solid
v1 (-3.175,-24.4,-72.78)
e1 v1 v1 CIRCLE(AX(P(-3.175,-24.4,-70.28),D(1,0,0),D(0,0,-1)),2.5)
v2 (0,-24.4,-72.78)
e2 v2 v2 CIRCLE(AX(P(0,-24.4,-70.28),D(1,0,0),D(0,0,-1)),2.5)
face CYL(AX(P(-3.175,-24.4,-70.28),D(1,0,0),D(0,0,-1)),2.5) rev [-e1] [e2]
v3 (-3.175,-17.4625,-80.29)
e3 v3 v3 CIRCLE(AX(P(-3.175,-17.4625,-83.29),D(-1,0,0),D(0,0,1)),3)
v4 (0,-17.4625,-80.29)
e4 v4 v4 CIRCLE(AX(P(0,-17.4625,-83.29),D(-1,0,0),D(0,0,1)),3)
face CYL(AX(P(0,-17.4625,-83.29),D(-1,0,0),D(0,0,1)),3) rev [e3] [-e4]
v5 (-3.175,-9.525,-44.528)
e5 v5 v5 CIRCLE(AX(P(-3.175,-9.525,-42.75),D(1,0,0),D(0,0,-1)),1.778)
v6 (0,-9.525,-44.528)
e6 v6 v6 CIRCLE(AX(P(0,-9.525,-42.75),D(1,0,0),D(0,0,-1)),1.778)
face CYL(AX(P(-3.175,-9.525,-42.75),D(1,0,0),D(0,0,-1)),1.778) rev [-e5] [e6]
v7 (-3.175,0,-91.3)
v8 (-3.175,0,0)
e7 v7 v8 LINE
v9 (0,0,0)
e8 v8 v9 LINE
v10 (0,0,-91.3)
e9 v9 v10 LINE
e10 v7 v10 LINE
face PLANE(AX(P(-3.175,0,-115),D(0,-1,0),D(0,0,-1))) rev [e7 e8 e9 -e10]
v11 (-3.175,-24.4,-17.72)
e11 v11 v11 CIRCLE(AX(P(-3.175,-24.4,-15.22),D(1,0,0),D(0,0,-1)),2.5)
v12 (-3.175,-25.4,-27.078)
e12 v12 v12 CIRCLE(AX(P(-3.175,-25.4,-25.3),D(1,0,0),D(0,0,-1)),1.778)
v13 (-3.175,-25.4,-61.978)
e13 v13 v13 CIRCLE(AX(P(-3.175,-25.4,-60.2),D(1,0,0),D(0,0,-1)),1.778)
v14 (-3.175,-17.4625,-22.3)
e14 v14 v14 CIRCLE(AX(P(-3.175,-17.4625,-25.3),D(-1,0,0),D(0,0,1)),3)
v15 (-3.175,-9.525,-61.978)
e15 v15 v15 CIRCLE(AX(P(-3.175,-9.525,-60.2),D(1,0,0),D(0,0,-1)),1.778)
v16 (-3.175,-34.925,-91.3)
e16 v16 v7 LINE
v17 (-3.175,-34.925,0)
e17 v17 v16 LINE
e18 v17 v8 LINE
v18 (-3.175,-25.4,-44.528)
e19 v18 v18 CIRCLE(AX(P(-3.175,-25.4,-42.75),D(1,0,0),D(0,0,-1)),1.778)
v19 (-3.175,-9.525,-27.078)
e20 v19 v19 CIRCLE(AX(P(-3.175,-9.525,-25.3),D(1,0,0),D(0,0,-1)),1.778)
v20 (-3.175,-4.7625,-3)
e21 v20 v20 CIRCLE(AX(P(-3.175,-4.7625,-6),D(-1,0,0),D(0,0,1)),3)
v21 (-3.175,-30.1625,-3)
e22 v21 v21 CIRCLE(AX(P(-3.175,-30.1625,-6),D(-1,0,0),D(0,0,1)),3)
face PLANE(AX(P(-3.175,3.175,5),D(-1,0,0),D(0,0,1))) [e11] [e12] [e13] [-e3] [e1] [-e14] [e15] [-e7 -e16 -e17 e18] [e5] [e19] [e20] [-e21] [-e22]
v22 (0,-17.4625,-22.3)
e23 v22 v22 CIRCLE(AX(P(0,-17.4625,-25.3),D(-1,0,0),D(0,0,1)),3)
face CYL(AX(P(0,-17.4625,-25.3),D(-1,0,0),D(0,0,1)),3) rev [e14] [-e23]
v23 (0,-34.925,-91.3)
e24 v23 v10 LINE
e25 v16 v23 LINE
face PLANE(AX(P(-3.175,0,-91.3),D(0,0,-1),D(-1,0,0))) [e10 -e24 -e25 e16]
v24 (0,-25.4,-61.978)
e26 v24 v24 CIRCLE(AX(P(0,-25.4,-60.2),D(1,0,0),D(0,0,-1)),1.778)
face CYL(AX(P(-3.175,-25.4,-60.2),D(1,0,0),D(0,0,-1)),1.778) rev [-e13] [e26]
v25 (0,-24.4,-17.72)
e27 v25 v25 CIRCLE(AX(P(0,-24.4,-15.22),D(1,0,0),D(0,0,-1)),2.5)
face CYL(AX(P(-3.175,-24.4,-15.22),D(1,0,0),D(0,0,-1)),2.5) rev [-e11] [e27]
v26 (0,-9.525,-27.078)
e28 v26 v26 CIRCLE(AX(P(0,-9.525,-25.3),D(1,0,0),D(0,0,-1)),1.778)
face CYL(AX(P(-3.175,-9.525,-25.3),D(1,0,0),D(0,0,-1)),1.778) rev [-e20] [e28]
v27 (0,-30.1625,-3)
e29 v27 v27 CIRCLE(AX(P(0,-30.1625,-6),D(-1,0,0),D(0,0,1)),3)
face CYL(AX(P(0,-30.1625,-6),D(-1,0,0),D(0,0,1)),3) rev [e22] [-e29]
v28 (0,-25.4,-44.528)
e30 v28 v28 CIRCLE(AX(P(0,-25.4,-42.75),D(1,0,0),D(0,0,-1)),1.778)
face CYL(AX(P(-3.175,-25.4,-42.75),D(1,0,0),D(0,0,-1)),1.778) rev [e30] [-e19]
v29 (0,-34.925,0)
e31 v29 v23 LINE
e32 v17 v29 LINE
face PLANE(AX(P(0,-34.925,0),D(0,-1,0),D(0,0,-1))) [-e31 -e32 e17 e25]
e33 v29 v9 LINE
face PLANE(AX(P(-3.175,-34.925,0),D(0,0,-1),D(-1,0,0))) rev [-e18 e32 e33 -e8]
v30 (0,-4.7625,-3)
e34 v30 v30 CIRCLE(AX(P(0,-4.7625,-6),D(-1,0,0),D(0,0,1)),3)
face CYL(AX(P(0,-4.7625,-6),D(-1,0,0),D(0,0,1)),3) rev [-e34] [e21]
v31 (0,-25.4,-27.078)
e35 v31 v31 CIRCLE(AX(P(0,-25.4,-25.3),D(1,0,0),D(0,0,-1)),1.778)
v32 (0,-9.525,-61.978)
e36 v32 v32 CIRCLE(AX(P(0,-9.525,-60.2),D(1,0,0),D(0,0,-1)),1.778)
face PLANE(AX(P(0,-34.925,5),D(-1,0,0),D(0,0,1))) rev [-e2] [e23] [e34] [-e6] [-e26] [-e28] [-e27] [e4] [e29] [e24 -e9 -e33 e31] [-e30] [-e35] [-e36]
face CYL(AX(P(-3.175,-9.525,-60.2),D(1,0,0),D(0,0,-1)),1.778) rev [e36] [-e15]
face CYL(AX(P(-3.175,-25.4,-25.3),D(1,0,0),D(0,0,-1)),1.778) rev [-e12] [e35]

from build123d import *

# Parameters (mm, degrees)
SKETCH1_W                      = 38.1
SKETCH1_H                      = 120
BOSS_EXTRUDE1_DEPTH            = 38.1
SKETCH2_W                      = 34.925
SKETCH2_H                      = 34.925
CUT_EXTRUDE1_DEPTH             = 130.767142413
F_4_2_4_2_DIAMETER_HOLE1_D     = 4.2
F_6_0_6_DIAMETER_HOLE1_D       = 6
F_4_2_4_2_DIAMETER_HOLE2_D     = 4.2
F_4_2_4_2_DIAMETER_HOLE2_DEPTH = 38.1
F_6_0_6_DIAMETER_HOLE2_D       = 6
F_6_0_6_DIAMETER_HOLE2_DEPTH   = 38.1
F_6_0_6_DIAMETER_HOLE3_D       = 6
F_6_0_6_DIAMETER_HOLE3_DEPTH   = 38.1
F_4_2_4_2_DIAMETER_HOLE3_D     = 4.2
SKETCH15_R                     = 2.1
SKETCH15_R_2                   = 3
BOSS_EXTRUDE2_DEPTH            = 3.175
BOSS_EXTRUDE3_START            = -3.175
SKETCH16_R                     = 2.1
BOSS_EXTRUDE3_DEPTH            = 3.175
SKETCH18_W                     = 3.175
SKETCH18_H                     = 3.175
CUT_EXTRUDE2_DEPTH             = 130.767142413
CUT_EXTRUDE3_START             = -3.175
CUT_EXTRUDE3_OUTLINE_R         = 2.1
CUT_EXTRUDE3_DEPTH             = 3.175
BOSS_EXTRUDE4_START            = -3.175
BOSS_EXTRUDE4_OUTLINE_R        = 3
BOSS_EXTRUDE4_DEPTH            = 3.175
SKETCH19_R                     = 3
CUT_EXTRUDE4_DEPTH             = 121.228267267
BOSS_EXTRUDE5_START            = -3.175
SKETCH20_R                     = 2.1
SKETCH20_R_2                   = 3
BOSS_EXTRUDE5_DEPTH            = 3.175
SKETCH23_R                     = 1.778
SKETCH23_R_2                   = 2.5
CUT_EXTRUDE5_DEPTH             = 121.228267267
SKETCH24_W                     = 5
SKETCH24_H                     = 34.925
CUT_EXTRUDE6_DEPTH             = 121.228267267
CUT_EXTRUDE7_DEPTH             = 121.228267267
CUT_EXTRUDE7_DEPTH_BACK        = 121.228267267
SKETCH25_W                     = 23.7
SKETCH25_H                     = 34.925


# Read off the part's stored shape, not the designer's step: Cut-Extrude3, Boss-Extrude4
with BuildPart() as part:
    # Sketch1 → Boss-Extrude1 (new body)
    with BuildSketch(Plane.XZ.offset(34.925)):
        with Locations((15.875, -55)):
            Rectangle(SKETCH1_W, SKETCH1_H)
    extrude(amount=-BOSS_EXTRUDE1_DEPTH)

    # Sketch2 → Cut-Extrude1 (cut, through all)
    with BuildSketch(Plane(origin=(0, 0, -115), x_dir=(-1, 0, 0), z_dir=(0, 0, -1))):
        with Locations((-17.4625, -17.4625)):
            Rectangle(SKETCH2_W, SKETCH2_H)
    extrude(amount=-CUT_EXTRUDE1_DEPTH, mode=Mode.SUBTRACT)

    # Ø4.2 (4.2) Diameter Hole1 (through all)
    with Locations(Plane(origin=(0, 0, 0), x_dir=(-1, 0, 0), z_dir=(0, -1, 0))):
        with Locations((-5, 35.97), (-5, 91.03)):
            Hole(F_4_2_4_2_DIAMETER_HOLE1_D / 2)

    # Ø6.0 (6) Diameter Hole1 (through all)
    with Locations(Plane(origin=(0, 0, 0), x_dir=(-1, 0, 0), z_dir=(0, -1, 0))):
        with Locations((-22.225, 106.5), (-22.225, 46.5)):
            Hole(F_6_0_6_DIAMETER_HOLE1_D / 2)

    # Ø4.2 (4.2) Diameter Hole2
    with Locations(Plane(origin=(0, 3.175, 0), x_dir=(1, 0, 0), z_dir=(0, 1, 0))):
        with Locations((22.225, 33.5), (22.225, 93.5), (29.296067812, 100.571067812), (29.296067812, 26.428932188)):
            Hole(F_4_2_4_2_DIAMETER_HOLE2_D / 2, depth=F_4_2_4_2_DIAMETER_HOLE2_DEPTH)

    # Ø6.0 (6) Diameter Hole2
    with Locations(Plane(origin=(0, 3.175, 0), x_dir=(1, 0, 0), z_dir=(0, 1, 0))):
        with Locations((24.925, 6)):
            Hole(F_6_0_6_DIAMETER_HOLE2_D / 2, depth=F_6_0_6_DIAMETER_HOLE2_DEPTH)

    # Ø6.0 (6) Diameter Hole3
    with Locations(Plane.ZY.offset(3.175)):
        with Locations((-6, -24.925), (-106.5, -22.225), (-46.5, -22.225)):
            Hole(F_6_0_6_DIAMETER_HOLE3_D / 2, depth=F_6_0_6_DIAMETER_HOLE3_DEPTH)

    # Ø4.2 (4.2) Diameter Hole3 (through all)
    with Locations(Plane.ZY.offset(3.175)):
        with Locations((-93.5, -22.225), (-33.5, -22.225), (-35.97, -5), (-91.03, -5), (-100.571067812, -29.296067812), (-26.428932188, -29.296067812)):
            Hole(F_4_2_4_2_DIAMETER_HOLE3_D / 2)

    # Sketch15 → Boss-Extrude2 (add)
    with BuildSketch(Plane(origin=(0, 3.175, 0), x_dir=(1, 0, 0), z_dir=(0, 1, 0))):
        with Locations((29.296067812, 26.428932188)):
            Circle(SKETCH15_R)
        with Locations((29.296067812, 100.571067812)):
            Circle(SKETCH15_R)
        with Locations((22.225, 106.5)):
            Circle(SKETCH15_R_2)
        with Locations((22.225, 46.5)):
            Circle(SKETCH15_R_2)
        with Locations((5, 35.97)):
            Circle(SKETCH15_R)
        with Locations((5, 91.03)):
            Circle(SKETCH15_R)
    extrude(amount=-BOSS_EXTRUDE2_DEPTH)

    # Sketch16 → Boss-Extrude3 (add)
    with BuildSketch(Plane.ZY.offset(3.175).offset(BOSS_EXTRUDE3_START)):
        with Locations((-100.571067812, -29.296067812)):
            Circle(SKETCH16_R)
        with Locations((-26.428932188, -29.296067812)):
            Circle(SKETCH16_R)
        with Locations((-35.97, -5)):
            Circle(SKETCH16_R)
        with Locations((-91.03, -5)):
            Circle(SKETCH16_R)
    extrude(amount=BOSS_EXTRUDE3_DEPTH)

    # Sketch18 → Cut-Extrude2 (cut, through all)
    with BuildSketch(Plane.XY.offset(5)):
        with Locations((-1.5875, 1.5875)):
            Rectangle(SKETCH18_W, SKETCH18_H)
    extrude(amount=-CUT_EXTRUDE2_DEPTH, mode=Mode.SUBTRACT)


with BuildPart() as body_2:
    # of the pieces the cut leaves, the one that is kept (cut_extrude2_keep)
    add(part.part.solids().sort_by_distance((-3.175, -34.925, -115))[0])

    # Cut-Extrude3 outline → Cut-Extrude3 (cut)
    with BuildSketch(Plane.YZ.offset(CUT_EXTRUDE3_START)):
        with Locations((-5, -91.03)):
            Circle(CUT_EXTRUDE3_OUTLINE_R)
        with Locations((-5, -35.97)):
            Circle(CUT_EXTRUDE3_OUTLINE_R)
        with Locations((-29.296067812, -26.428932188)):
            Circle(CUT_EXTRUDE3_OUTLINE_R)
        with Locations((-29.296067812, -100.571067812)):
            Circle(CUT_EXTRUDE3_OUTLINE_R)
    extrude(amount=CUT_EXTRUDE3_DEPTH, mode=Mode.SUBTRACT)

    # Boss-Extrude4 outline → Boss-Extrude4 (add)
    with BuildSketch(Plane.YZ.offset(BOSS_EXTRUDE4_START)):
        with Locations((-22.225, -46.5)):
            Circle(BOSS_EXTRUDE4_OUTLINE_R)
        with Locations((-22.225, -106.5)):
            Circle(BOSS_EXTRUDE4_OUTLINE_R)
        with Locations((-24.925, -6)):
            Circle(BOSS_EXTRUDE4_OUTLINE_R)
    extrude(amount=BOSS_EXTRUDE4_DEPTH)

    # Sketch19 → Cut-Extrude4 (cut, through all)
    with BuildSketch(Plane.ZY.offset(3.175)):
        with Locations((-6, -4.7625)):
            Circle(SKETCH19_R)
        with Locations((-6, -30.1625)):
            Circle(SKETCH19_R)
        with Locations((-25.3, -17.4625)):
            Circle(SKETCH19_R)
        with Locations((-83.29, -17.4625)):
            Circle(SKETCH19_R)
    extrude(amount=-CUT_EXTRUDE4_DEPTH, mode=Mode.SUBTRACT)

    # Sketch20 → Boss-Extrude5 (add)
    with BuildSketch(Plane(origin=(0, 0, 0), x_dir=(0, 0, -1), z_dir=(1, 0, 0)).offset(BOSS_EXTRUDE5_START)):
        with Locations((26.428932188, -29.296067812)):
            Circle(SKETCH20_R)
        with Locations((33.8, -17.4625)):
            Circle(SKETCH20_R_2)
        with Locations((33.5, -22.225)):
            Circle(SKETCH20_R)
        with Locations((35.97, -5)):
            Circle(SKETCH20_R)
        with Locations((91.03, -5)):
            Circle(SKETCH20_R)
        with Locations((93.8, -17.4625)):
            Circle(SKETCH20_R_2)
        with Locations((93.5, -22.225)):
            Circle(SKETCH20_R)
        with Locations((100.571067812, -29.296067812)):
            Circle(SKETCH20_R)
    extrude(amount=BOSS_EXTRUDE5_DEPTH)

    # Sketch23 → Cut-Extrude5 (cut, through all)
    with BuildSketch(Plane(origin=(0, 0, 0), x_dir=(0, 0, -1), z_dir=(1, 0, 0))):
        with Locations((42.75, -9.525)):
            Circle(SKETCH23_R)
        with Locations((25.3, -9.525)):
            Circle(SKETCH23_R)
        with Locations((15.22, -24.4)):
            Circle(SKETCH23_R_2)
        with Locations((25.3, -25.4)):
            Circle(SKETCH23_R)
        with Locations((42.75, -25.4)):
            Circle(SKETCH23_R)
        with Locations((60.2, -9.525)):
            Circle(SKETCH23_R)
        with Locations((60.2, -25.4)):
            Circle(SKETCH23_R)
        with Locations((70.28, -24.4)):
            Circle(SKETCH23_R_2)
    extrude(amount=-CUT_EXTRUDE5_DEPTH, mode=Mode.SUBTRACT)

    # Sketch24 → Cut-Extrude6 (cut, through all)
    with BuildSketch(Plane(origin=(0, 0, 0), x_dir=(0, 0, -1), z_dir=(1, 0, 0))):
        with Locations((-2.5, -17.4625)):
            Rectangle(SKETCH24_W, SKETCH24_H)
    extrude(amount=-CUT_EXTRUDE6_DEPTH, mode=Mode.SUBTRACT)

    # Sketch25 → Cut-Extrude7 (cut, two sides: drawn at the far end of the back side and taken through both)
    with BuildSketch(Plane(origin=(0, 0, 0), x_dir=(0, 0, -1), z_dir=(1, 0, 0)).offset(-CUT_EXTRUDE7_DEPTH_BACK)):
        with Locations((103.15, -17.4625)):
            Rectangle(SKETCH25_W, SKETCH25_H)
    extrude(amount=CUT_EXTRUDE7_DEPTH + CUT_EXTRUDE7_DEPTH_BACK, mode=Mode.SUBTRACT)


solid = body_2.part
